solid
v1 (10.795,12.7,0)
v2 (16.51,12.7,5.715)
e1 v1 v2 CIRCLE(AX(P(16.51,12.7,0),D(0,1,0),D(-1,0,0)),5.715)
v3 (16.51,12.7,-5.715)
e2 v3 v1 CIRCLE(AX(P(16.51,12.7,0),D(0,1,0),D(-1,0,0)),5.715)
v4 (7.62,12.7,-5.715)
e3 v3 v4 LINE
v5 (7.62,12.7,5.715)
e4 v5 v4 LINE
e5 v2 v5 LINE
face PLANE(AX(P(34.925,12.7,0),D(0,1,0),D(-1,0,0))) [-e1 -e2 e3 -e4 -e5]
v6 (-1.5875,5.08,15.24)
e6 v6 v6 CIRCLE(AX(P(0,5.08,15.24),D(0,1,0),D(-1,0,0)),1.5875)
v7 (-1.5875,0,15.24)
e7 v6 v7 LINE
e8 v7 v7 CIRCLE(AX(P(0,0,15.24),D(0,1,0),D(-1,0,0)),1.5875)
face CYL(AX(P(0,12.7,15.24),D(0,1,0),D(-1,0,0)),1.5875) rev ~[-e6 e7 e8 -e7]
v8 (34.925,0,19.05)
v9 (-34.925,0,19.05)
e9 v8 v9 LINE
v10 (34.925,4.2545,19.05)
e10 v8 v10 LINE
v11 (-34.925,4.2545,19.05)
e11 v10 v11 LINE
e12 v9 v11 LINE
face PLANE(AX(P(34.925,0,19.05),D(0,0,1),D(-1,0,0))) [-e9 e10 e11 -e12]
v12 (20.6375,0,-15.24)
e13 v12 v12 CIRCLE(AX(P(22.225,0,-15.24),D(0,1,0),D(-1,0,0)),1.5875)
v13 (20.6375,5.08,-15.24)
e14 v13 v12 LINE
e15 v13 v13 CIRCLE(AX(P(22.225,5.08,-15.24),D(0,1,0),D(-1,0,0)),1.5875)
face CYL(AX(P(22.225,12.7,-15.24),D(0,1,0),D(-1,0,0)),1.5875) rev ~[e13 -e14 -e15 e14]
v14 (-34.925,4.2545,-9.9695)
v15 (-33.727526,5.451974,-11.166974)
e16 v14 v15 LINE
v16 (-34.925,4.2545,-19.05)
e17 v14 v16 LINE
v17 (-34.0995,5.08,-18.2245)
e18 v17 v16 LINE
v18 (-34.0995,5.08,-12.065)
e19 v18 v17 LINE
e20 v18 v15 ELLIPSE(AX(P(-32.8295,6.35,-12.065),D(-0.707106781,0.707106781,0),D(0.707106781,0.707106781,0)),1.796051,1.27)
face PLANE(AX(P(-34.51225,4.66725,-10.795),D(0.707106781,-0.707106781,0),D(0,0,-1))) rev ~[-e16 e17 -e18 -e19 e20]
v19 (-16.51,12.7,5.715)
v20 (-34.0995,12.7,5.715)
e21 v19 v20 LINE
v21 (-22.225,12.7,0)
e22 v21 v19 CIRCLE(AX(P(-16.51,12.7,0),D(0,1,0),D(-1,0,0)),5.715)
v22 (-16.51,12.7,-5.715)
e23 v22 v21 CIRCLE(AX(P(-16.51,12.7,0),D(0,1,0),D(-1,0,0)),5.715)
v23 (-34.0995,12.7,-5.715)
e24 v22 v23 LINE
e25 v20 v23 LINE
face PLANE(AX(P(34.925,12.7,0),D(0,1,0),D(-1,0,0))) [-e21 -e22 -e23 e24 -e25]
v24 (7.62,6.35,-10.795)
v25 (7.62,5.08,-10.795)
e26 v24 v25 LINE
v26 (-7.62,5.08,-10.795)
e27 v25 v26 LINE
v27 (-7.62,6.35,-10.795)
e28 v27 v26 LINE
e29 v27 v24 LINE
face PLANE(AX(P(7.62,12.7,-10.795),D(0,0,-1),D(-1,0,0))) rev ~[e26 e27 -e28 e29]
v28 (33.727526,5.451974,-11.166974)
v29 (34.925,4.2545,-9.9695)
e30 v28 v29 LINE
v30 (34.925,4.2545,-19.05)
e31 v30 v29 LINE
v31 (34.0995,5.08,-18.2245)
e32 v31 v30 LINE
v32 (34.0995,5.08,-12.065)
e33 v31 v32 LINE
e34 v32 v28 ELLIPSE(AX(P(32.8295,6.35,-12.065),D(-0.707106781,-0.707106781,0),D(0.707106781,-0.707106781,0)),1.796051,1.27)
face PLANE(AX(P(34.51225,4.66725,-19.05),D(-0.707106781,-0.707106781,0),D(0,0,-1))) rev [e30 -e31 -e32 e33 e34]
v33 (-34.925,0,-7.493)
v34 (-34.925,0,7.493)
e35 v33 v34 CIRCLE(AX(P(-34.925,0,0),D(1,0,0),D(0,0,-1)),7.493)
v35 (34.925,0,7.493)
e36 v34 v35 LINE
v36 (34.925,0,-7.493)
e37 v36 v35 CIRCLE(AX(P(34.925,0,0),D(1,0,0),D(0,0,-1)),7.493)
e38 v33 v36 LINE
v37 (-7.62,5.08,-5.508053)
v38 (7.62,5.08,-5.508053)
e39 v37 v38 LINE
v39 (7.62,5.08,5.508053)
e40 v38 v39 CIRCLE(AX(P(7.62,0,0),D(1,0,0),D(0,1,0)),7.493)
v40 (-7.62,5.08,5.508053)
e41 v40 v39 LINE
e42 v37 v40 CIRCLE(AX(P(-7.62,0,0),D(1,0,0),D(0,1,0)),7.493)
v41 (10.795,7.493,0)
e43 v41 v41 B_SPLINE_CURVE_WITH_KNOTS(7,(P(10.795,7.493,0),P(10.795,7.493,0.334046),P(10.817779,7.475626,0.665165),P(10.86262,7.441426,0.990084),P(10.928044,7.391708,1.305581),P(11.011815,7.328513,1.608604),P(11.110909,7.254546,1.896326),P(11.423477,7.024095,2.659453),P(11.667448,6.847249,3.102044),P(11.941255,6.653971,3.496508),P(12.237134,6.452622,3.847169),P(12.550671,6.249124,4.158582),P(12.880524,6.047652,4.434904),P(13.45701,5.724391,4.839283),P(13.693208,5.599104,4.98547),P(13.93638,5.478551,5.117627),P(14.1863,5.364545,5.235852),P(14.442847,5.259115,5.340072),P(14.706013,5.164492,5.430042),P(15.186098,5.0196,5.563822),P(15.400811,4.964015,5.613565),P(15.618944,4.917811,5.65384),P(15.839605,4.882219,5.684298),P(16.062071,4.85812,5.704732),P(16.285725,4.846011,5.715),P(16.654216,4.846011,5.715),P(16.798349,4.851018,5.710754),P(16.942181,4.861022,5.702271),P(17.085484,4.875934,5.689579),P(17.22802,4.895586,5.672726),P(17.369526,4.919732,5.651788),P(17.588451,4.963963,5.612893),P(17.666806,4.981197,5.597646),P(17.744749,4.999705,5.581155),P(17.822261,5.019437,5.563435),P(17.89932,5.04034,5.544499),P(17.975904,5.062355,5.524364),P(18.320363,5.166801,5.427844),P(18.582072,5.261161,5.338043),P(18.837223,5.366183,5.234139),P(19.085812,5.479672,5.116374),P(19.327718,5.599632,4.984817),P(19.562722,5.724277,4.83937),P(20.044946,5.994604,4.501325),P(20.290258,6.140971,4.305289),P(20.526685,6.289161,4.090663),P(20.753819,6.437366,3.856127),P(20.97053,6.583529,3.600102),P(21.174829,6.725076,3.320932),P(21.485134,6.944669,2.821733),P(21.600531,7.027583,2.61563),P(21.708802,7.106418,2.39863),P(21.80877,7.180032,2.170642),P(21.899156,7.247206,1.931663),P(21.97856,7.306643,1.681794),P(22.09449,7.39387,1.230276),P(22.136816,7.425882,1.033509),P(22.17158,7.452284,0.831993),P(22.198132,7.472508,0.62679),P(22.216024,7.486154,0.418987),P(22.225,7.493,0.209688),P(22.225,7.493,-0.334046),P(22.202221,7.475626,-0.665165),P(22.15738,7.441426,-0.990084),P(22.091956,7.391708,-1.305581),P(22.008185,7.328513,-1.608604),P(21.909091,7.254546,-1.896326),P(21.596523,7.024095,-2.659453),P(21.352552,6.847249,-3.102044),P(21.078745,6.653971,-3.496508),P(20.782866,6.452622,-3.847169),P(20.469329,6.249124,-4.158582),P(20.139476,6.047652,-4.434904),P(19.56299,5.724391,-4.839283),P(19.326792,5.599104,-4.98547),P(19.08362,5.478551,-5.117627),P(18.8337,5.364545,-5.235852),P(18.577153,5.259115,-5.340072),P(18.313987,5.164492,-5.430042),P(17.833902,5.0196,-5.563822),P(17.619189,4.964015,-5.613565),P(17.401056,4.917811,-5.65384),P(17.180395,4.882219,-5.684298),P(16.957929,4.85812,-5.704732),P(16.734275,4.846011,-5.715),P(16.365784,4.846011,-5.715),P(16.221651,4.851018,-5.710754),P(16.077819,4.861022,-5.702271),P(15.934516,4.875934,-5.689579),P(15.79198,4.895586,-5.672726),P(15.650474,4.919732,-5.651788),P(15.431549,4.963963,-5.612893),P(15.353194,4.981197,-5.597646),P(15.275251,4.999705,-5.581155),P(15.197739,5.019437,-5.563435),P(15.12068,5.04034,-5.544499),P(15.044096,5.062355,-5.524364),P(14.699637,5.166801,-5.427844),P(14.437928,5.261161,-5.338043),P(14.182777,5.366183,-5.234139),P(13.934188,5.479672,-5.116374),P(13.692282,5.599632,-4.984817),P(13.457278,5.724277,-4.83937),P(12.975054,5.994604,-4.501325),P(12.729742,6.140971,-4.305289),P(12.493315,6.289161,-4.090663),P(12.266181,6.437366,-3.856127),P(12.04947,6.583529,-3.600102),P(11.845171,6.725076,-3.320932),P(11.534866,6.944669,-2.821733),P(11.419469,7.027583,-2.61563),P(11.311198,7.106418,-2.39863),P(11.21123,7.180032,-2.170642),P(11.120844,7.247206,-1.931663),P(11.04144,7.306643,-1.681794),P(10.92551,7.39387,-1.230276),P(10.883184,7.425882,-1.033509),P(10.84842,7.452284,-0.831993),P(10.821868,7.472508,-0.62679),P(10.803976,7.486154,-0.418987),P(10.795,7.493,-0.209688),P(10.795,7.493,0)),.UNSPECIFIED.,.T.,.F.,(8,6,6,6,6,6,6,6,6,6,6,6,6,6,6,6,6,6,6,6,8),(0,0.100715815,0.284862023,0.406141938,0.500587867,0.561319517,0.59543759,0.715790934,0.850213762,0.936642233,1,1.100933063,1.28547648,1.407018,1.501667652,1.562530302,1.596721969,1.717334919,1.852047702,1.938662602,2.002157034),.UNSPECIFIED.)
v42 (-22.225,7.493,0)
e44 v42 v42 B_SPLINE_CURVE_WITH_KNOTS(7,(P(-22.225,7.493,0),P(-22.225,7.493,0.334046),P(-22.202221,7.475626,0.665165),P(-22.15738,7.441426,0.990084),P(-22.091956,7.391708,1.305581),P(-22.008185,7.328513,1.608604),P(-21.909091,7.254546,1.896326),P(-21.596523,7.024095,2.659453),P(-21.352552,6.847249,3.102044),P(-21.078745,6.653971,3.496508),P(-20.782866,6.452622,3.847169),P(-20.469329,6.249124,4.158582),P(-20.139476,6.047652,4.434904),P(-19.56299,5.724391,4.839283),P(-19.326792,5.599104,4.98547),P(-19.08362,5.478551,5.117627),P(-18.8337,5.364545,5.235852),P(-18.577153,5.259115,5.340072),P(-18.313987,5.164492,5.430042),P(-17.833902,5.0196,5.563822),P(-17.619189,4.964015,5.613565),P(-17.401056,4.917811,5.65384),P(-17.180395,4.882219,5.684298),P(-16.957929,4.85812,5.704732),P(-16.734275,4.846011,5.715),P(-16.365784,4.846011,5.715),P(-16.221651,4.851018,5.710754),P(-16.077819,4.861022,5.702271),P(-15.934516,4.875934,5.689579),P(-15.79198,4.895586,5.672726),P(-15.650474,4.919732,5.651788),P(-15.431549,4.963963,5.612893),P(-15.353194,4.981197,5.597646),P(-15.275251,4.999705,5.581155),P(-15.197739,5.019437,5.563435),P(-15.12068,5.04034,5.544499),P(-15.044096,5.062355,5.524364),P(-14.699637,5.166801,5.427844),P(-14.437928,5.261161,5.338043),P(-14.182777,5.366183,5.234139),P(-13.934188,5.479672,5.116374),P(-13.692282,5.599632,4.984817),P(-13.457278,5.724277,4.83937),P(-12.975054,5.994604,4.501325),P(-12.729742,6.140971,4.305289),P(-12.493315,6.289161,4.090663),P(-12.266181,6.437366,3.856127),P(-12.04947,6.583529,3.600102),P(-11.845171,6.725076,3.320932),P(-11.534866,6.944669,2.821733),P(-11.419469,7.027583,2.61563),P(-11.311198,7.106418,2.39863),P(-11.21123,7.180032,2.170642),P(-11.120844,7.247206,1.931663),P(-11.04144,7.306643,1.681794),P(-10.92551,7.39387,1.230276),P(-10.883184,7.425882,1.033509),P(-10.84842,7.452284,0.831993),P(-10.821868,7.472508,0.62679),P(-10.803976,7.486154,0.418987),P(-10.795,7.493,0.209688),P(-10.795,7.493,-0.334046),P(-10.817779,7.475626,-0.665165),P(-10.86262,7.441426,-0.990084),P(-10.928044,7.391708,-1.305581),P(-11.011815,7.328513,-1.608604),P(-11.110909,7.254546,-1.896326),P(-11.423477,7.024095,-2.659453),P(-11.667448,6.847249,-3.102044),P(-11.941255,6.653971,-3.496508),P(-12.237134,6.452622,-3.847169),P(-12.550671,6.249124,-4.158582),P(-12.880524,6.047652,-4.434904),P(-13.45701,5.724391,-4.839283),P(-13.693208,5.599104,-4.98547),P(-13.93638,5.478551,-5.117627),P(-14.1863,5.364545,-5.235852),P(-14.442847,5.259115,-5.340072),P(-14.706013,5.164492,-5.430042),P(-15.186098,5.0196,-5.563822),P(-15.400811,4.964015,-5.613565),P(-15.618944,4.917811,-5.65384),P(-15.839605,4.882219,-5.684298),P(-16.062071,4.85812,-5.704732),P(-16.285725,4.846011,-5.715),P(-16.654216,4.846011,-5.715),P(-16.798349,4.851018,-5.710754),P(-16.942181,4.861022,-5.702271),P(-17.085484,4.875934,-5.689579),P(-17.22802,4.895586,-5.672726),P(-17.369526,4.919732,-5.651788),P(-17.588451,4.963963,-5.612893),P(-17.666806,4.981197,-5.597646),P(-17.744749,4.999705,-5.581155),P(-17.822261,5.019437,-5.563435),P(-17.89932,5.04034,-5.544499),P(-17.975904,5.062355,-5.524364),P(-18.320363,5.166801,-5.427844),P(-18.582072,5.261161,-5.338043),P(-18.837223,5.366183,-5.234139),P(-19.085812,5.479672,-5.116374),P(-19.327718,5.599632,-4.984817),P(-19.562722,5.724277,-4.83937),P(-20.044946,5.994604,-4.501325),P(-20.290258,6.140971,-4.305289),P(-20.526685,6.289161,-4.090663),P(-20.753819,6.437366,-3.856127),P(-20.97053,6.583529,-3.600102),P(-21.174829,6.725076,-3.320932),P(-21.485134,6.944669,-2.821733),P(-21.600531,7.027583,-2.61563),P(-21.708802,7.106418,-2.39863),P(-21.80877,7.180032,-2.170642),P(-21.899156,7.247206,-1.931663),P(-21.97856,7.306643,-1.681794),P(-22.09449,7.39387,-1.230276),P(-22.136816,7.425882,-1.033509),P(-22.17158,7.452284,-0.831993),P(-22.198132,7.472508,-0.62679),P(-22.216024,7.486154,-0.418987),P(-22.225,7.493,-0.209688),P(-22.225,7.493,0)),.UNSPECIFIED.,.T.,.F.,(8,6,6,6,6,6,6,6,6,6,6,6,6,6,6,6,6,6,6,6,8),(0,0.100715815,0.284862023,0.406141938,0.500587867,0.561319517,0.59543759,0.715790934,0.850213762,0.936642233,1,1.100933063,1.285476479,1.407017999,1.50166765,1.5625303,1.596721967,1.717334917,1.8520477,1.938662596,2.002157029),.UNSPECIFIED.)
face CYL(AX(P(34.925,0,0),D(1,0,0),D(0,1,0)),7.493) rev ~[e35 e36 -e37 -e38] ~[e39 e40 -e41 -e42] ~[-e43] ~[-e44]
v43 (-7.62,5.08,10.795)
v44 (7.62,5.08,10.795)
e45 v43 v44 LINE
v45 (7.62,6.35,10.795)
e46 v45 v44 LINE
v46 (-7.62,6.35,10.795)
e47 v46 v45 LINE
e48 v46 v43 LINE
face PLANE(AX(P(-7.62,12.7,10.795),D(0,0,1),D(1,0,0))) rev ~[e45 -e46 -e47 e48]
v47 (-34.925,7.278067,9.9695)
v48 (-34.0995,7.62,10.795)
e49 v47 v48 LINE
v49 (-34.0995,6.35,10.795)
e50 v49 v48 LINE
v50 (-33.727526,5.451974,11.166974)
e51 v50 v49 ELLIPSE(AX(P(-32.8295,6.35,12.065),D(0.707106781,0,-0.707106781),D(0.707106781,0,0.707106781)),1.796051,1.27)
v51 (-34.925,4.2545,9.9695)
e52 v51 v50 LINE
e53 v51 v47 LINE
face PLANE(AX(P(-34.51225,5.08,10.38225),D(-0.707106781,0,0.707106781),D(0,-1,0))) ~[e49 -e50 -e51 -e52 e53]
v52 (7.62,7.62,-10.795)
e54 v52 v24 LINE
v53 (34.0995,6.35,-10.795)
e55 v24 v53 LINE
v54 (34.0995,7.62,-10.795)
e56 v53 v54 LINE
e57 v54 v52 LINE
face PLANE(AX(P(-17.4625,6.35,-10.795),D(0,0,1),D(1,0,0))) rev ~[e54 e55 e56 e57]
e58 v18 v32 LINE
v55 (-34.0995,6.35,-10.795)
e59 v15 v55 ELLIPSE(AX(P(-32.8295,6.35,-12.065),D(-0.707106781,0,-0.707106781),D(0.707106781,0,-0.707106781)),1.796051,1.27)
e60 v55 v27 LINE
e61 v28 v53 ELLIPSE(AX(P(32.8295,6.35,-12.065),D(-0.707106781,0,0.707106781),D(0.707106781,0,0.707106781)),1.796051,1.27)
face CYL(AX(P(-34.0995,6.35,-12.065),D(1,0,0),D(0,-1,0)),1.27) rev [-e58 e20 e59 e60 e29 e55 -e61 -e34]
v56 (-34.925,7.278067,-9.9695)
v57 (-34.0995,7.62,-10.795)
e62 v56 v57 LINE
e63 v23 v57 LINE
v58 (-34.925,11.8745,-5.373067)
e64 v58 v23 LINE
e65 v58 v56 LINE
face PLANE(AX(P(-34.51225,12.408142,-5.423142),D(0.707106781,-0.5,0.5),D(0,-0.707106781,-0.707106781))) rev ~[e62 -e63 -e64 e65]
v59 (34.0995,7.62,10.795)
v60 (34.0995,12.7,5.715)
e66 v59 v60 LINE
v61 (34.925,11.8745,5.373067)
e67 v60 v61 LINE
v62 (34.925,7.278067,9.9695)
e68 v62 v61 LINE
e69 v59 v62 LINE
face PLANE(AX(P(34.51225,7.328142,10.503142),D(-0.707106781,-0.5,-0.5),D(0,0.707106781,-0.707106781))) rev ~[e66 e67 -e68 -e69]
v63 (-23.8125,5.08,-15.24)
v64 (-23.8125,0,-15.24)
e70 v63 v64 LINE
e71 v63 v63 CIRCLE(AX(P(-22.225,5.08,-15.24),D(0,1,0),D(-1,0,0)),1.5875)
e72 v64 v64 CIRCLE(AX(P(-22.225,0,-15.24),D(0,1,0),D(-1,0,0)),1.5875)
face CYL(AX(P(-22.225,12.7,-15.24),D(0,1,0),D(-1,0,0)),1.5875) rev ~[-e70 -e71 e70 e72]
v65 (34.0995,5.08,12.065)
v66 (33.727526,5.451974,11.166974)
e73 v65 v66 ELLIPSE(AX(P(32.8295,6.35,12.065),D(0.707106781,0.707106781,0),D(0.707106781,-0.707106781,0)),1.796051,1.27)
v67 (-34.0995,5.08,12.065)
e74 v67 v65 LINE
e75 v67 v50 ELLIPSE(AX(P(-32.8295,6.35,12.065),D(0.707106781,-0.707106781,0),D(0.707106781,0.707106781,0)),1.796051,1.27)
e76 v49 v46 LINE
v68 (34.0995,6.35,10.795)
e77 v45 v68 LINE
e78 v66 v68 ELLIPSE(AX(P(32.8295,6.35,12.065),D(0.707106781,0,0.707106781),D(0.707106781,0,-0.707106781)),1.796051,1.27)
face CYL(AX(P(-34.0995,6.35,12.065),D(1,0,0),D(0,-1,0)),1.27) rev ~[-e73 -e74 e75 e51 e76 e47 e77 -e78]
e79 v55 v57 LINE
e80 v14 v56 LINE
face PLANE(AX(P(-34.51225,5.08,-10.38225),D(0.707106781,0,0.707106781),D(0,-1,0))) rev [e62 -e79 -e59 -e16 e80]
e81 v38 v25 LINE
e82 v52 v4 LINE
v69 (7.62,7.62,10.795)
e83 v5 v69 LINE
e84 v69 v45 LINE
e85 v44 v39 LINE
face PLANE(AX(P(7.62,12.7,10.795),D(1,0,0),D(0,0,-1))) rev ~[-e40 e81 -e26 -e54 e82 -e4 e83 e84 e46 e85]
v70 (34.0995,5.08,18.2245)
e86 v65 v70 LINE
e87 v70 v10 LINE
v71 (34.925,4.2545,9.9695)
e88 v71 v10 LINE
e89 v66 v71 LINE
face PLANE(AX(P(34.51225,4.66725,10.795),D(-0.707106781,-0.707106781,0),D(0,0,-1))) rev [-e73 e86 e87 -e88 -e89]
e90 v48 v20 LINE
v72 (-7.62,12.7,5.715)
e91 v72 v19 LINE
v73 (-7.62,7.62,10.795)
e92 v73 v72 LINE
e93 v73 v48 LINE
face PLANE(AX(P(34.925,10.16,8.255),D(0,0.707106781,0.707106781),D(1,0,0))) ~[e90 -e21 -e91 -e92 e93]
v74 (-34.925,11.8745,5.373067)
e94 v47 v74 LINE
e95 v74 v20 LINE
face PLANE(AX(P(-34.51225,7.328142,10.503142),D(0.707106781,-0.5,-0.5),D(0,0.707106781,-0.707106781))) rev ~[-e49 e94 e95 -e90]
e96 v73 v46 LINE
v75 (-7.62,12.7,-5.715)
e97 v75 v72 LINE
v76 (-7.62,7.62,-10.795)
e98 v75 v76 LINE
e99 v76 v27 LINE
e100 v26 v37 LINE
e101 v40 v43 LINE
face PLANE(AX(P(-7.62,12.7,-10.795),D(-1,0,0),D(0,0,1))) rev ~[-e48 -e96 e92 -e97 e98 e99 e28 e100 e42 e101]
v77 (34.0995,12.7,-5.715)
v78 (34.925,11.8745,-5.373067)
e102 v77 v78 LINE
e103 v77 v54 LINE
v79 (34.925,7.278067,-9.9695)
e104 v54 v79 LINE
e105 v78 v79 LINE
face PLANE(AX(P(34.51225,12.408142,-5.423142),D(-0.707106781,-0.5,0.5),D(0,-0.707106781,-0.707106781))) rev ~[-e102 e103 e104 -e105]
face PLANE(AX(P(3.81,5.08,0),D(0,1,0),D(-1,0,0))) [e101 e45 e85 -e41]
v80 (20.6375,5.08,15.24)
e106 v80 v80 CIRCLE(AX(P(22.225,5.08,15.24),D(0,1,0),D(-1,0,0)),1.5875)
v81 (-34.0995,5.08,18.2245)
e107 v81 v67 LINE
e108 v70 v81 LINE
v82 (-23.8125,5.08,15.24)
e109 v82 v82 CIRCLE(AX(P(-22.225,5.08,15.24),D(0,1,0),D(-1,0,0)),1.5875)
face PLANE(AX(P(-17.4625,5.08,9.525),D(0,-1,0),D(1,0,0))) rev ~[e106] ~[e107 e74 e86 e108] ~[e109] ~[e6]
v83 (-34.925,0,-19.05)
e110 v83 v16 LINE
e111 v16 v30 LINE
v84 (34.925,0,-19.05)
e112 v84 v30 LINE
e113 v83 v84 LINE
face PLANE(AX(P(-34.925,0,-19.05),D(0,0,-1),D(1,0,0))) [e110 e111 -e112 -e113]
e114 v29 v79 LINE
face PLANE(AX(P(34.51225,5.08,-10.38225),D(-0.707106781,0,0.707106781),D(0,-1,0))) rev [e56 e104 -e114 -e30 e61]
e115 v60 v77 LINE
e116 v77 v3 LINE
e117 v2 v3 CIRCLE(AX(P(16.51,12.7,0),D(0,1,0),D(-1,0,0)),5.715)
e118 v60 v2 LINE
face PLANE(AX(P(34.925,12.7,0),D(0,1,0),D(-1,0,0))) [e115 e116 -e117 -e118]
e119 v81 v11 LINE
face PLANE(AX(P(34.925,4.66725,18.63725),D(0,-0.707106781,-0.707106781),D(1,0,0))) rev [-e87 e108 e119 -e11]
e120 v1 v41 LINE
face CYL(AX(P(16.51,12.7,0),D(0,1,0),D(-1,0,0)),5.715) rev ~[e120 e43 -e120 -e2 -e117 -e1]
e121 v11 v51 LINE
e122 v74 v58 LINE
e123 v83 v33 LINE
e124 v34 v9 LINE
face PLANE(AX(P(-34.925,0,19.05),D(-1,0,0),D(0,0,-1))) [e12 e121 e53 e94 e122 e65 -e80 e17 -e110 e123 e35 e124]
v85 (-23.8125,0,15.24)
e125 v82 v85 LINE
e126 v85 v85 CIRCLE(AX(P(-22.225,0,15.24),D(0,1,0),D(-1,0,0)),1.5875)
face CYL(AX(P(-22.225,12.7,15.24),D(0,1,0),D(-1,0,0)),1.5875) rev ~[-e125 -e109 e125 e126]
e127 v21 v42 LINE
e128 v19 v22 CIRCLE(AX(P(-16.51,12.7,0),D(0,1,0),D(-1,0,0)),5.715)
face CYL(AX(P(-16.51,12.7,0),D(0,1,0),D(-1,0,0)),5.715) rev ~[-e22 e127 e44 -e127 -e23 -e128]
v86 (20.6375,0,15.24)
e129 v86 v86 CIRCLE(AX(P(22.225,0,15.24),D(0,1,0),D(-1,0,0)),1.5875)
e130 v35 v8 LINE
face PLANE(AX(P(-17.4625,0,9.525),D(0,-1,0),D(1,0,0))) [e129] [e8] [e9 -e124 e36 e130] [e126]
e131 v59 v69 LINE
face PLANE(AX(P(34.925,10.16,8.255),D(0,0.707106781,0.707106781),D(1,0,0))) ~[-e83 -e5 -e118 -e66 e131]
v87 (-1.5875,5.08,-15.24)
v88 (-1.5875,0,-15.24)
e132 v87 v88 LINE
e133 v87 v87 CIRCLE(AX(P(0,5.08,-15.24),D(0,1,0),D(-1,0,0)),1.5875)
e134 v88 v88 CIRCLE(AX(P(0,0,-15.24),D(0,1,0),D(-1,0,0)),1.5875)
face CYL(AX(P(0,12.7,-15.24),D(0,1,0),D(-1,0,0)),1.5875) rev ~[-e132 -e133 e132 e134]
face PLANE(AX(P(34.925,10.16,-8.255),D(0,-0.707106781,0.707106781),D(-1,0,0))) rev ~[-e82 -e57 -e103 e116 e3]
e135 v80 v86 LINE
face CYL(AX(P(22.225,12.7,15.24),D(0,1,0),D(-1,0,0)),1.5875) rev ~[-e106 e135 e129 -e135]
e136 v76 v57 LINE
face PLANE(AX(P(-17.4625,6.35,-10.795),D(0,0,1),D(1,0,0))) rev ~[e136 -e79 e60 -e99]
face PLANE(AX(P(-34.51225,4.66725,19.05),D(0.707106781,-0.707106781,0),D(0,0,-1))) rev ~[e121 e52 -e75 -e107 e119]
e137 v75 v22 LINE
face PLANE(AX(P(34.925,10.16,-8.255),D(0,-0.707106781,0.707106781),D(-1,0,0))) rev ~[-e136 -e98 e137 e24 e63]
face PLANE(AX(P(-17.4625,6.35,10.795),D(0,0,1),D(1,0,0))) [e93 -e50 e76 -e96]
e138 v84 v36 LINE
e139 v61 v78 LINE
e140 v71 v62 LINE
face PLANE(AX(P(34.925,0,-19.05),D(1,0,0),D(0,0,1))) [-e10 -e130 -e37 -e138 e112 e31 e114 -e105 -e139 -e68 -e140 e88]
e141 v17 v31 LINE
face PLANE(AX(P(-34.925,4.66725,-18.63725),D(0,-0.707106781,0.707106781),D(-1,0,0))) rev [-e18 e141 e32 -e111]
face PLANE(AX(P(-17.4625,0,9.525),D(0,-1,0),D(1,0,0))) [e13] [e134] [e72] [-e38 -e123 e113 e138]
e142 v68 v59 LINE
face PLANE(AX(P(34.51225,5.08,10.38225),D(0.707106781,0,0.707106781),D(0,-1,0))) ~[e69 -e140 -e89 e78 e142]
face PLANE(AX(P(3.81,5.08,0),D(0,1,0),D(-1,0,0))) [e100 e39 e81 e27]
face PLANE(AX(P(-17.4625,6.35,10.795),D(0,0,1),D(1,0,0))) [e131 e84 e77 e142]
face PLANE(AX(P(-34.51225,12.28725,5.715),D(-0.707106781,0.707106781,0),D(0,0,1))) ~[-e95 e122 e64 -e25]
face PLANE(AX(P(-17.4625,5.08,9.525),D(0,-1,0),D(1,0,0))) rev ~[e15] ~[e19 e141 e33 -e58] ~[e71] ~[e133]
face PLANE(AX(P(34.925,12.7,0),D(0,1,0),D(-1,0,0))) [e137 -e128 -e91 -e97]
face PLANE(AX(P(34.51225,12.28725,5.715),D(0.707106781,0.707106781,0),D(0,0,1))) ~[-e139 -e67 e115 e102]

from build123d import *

# Parameters (mm, degrees)
F0_W      = 34.925
F0_H      = 12.7
F1_DEPTH  = 10.795
F2_DEPTH  = 10.795
F3_W      = 34.925
F3_H      = 19.05
F4_DEPTH  = 5.08
F5_R      = 7.493
F6_DEPTH  = 101.6
F7_R      = 1.5875
F8_DEPTH  = 25.4
F9_SIZE   = 5.08
F10_SIZE  = 0.8255
F11_R     = 1.27
F12_R     = 5.715
F13_DEPTH = 25.4
F14_W     = 7.62
F14_H     = 5.08
F15_DEPTH = 7.62


with BuildPart() as f1:
    # F0 (on Top) → F1 (new body)
    with BuildSketch(Plane.XY):
        with Locations((-17.4625, 6.35)):
            Rectangle(F0_W, F0_H)
        with Locations((17.4625, 6.35)):
            Rectangle(F0_W, F0_H)
    extrude(amount=F1_DEPTH)

    # F0 (on Top) → F2 (join)
    with BuildSketch(Plane.XY):
        with Locations((-17.4625, 6.35)):
            Rectangle(F0_W, F0_H)
        with Locations((17.4625, 6.35)):
            Rectangle(F0_W, F0_H)
    extrude(amount=-F2_DEPTH)

    # F3 (on Front) → F4 (join)
    with BuildSketch(Plane.XZ):
        with Locations((-17.4625, 9.525)):
            Rectangle(F3_W, F3_H)
        with Locations((-17.4625, -9.525)):
            Rectangle(F3_W, F3_H)
        Polygon((0, 19.05), (0, 0), (0, -19.05), (34.925, -19.05), (34.925, 0), (34.925, 19.05), align=None)
    extrude(amount=-F4_DEPTH)

    # F5 (on face) → F6 (cut)
    with BuildSketch(Plane.YZ.offset(34.925)):
        Circle(F5_R)
    extrude(amount=-F6_DEPTH, mode=Mode.SUBTRACT)

    # F7 (on face) → F8 (cut)
    with BuildSketch(Plane(origin=(0, 12.7, 0), x_dir=(-1, 0, 0), z_dir=(0, 1, 0))):
        with Locations((-22.225, -15.24)):
            Circle(F7_R)
        with Locations((-22.225, 15.24)):
            Circle(F7_R)
        with Locations((0, -15.24)):
            Circle(F7_R)
        with Locations((22.225, 15.24)):
            Circle(F7_R)
        with Locations((22.225, -15.24)):
            Circle(F7_R)
        with Locations((0, 15.24)):
            Circle(F7_R)
    extrude(amount=-F8_DEPTH, mode=Mode.SUBTRACT)

    # F9
    f9_edges = [f1.edges().sort_by_distance(p)[0] for p in [
        (0, 12.7, -10.795),
        (0, 12.7, 10.795),
    ]]
    chamfer(f9_edges, length=F9_SIZE)

    # F10
    f10_edges = [f1.edges().sort_by_distance(p)[0] for p in [
        (0, 5.08, -19.05),
        (-34.925, 5.08, -14.9225),
        (-34.925, 10.16, 8.255),
        (-34.925, 12.7, 0),
        (-34.925, 10.16, -8.255),
        (34.925, 10.16, 8.255),
        (34.925, 12.7, 0),
        (34.925, 10.16, -8.255),
        (34.925, 6.35, -10.795),
        (34.925, 5.08, -14.9225),
        (0, 5.08, 19.05),
        (-34.925, 5.08, 14.9225),
        (-34.925, 6.35, 10.795),
        (34.925, 5.08, 14.9225),
        (34.925, 6.35, 10.795),
        (-34.925, 6.35, -10.795),
    ]]
    chamfer(f10_edges, length=F10_SIZE)

    # F11
    f11_edges = [f1.edges().sort_by_distance(p)[0] for p in [
        (0, 5.08, -10.795),
        (0, 5.08, 10.795),
    ]]
    fillet(f11_edges, radius=F11_R)

    # F12 (on face) → F13 (cut)
    with BuildSketch(Plane(origin=(0, 12.7, 0), x_dir=(-1, 0, 0), z_dir=(0, 1, 0))):
        with Locations((-16.51, 0)):
            Circle(F12_R)
        with Locations((16.51, 0)):
            Circle(F12_R)
    extrude(amount=-F13_DEPTH, mode=Mode.SUBTRACT)

    # F14 (on face) → F15 (cut)
    with BuildSketch(Plane(origin=(0, 12.7, 0), x_dir=(-1, 0, 0), z_dir=(0, 1, 0))):
        Polygon((0, -5.715), (0, 0), (0, 5.715), (-7.62, 5.715), (-7.62, -5.715), align=None)
        Polygon((0, 5.715), (0, 0), (0, -5.715), (7.62, -5.715), (7.62, 5.715), align=None)
        with Locations((3.81, 8.255)):
            Rectangle(F14_W, F14_H)
        with Locations((-3.81, 8.255)):
            Rectangle(F14_W, F14_H)
        with Locations((-3.81, -8.255)):
            Rectangle(F14_W, F14_H)
        with Locations((3.81, -8.255)):
            Rectangle(F14_W, F14_H)
    extrude(amount=-F15_DEPTH, mode=Mode.SUBTRACT)


solid = f1.part
